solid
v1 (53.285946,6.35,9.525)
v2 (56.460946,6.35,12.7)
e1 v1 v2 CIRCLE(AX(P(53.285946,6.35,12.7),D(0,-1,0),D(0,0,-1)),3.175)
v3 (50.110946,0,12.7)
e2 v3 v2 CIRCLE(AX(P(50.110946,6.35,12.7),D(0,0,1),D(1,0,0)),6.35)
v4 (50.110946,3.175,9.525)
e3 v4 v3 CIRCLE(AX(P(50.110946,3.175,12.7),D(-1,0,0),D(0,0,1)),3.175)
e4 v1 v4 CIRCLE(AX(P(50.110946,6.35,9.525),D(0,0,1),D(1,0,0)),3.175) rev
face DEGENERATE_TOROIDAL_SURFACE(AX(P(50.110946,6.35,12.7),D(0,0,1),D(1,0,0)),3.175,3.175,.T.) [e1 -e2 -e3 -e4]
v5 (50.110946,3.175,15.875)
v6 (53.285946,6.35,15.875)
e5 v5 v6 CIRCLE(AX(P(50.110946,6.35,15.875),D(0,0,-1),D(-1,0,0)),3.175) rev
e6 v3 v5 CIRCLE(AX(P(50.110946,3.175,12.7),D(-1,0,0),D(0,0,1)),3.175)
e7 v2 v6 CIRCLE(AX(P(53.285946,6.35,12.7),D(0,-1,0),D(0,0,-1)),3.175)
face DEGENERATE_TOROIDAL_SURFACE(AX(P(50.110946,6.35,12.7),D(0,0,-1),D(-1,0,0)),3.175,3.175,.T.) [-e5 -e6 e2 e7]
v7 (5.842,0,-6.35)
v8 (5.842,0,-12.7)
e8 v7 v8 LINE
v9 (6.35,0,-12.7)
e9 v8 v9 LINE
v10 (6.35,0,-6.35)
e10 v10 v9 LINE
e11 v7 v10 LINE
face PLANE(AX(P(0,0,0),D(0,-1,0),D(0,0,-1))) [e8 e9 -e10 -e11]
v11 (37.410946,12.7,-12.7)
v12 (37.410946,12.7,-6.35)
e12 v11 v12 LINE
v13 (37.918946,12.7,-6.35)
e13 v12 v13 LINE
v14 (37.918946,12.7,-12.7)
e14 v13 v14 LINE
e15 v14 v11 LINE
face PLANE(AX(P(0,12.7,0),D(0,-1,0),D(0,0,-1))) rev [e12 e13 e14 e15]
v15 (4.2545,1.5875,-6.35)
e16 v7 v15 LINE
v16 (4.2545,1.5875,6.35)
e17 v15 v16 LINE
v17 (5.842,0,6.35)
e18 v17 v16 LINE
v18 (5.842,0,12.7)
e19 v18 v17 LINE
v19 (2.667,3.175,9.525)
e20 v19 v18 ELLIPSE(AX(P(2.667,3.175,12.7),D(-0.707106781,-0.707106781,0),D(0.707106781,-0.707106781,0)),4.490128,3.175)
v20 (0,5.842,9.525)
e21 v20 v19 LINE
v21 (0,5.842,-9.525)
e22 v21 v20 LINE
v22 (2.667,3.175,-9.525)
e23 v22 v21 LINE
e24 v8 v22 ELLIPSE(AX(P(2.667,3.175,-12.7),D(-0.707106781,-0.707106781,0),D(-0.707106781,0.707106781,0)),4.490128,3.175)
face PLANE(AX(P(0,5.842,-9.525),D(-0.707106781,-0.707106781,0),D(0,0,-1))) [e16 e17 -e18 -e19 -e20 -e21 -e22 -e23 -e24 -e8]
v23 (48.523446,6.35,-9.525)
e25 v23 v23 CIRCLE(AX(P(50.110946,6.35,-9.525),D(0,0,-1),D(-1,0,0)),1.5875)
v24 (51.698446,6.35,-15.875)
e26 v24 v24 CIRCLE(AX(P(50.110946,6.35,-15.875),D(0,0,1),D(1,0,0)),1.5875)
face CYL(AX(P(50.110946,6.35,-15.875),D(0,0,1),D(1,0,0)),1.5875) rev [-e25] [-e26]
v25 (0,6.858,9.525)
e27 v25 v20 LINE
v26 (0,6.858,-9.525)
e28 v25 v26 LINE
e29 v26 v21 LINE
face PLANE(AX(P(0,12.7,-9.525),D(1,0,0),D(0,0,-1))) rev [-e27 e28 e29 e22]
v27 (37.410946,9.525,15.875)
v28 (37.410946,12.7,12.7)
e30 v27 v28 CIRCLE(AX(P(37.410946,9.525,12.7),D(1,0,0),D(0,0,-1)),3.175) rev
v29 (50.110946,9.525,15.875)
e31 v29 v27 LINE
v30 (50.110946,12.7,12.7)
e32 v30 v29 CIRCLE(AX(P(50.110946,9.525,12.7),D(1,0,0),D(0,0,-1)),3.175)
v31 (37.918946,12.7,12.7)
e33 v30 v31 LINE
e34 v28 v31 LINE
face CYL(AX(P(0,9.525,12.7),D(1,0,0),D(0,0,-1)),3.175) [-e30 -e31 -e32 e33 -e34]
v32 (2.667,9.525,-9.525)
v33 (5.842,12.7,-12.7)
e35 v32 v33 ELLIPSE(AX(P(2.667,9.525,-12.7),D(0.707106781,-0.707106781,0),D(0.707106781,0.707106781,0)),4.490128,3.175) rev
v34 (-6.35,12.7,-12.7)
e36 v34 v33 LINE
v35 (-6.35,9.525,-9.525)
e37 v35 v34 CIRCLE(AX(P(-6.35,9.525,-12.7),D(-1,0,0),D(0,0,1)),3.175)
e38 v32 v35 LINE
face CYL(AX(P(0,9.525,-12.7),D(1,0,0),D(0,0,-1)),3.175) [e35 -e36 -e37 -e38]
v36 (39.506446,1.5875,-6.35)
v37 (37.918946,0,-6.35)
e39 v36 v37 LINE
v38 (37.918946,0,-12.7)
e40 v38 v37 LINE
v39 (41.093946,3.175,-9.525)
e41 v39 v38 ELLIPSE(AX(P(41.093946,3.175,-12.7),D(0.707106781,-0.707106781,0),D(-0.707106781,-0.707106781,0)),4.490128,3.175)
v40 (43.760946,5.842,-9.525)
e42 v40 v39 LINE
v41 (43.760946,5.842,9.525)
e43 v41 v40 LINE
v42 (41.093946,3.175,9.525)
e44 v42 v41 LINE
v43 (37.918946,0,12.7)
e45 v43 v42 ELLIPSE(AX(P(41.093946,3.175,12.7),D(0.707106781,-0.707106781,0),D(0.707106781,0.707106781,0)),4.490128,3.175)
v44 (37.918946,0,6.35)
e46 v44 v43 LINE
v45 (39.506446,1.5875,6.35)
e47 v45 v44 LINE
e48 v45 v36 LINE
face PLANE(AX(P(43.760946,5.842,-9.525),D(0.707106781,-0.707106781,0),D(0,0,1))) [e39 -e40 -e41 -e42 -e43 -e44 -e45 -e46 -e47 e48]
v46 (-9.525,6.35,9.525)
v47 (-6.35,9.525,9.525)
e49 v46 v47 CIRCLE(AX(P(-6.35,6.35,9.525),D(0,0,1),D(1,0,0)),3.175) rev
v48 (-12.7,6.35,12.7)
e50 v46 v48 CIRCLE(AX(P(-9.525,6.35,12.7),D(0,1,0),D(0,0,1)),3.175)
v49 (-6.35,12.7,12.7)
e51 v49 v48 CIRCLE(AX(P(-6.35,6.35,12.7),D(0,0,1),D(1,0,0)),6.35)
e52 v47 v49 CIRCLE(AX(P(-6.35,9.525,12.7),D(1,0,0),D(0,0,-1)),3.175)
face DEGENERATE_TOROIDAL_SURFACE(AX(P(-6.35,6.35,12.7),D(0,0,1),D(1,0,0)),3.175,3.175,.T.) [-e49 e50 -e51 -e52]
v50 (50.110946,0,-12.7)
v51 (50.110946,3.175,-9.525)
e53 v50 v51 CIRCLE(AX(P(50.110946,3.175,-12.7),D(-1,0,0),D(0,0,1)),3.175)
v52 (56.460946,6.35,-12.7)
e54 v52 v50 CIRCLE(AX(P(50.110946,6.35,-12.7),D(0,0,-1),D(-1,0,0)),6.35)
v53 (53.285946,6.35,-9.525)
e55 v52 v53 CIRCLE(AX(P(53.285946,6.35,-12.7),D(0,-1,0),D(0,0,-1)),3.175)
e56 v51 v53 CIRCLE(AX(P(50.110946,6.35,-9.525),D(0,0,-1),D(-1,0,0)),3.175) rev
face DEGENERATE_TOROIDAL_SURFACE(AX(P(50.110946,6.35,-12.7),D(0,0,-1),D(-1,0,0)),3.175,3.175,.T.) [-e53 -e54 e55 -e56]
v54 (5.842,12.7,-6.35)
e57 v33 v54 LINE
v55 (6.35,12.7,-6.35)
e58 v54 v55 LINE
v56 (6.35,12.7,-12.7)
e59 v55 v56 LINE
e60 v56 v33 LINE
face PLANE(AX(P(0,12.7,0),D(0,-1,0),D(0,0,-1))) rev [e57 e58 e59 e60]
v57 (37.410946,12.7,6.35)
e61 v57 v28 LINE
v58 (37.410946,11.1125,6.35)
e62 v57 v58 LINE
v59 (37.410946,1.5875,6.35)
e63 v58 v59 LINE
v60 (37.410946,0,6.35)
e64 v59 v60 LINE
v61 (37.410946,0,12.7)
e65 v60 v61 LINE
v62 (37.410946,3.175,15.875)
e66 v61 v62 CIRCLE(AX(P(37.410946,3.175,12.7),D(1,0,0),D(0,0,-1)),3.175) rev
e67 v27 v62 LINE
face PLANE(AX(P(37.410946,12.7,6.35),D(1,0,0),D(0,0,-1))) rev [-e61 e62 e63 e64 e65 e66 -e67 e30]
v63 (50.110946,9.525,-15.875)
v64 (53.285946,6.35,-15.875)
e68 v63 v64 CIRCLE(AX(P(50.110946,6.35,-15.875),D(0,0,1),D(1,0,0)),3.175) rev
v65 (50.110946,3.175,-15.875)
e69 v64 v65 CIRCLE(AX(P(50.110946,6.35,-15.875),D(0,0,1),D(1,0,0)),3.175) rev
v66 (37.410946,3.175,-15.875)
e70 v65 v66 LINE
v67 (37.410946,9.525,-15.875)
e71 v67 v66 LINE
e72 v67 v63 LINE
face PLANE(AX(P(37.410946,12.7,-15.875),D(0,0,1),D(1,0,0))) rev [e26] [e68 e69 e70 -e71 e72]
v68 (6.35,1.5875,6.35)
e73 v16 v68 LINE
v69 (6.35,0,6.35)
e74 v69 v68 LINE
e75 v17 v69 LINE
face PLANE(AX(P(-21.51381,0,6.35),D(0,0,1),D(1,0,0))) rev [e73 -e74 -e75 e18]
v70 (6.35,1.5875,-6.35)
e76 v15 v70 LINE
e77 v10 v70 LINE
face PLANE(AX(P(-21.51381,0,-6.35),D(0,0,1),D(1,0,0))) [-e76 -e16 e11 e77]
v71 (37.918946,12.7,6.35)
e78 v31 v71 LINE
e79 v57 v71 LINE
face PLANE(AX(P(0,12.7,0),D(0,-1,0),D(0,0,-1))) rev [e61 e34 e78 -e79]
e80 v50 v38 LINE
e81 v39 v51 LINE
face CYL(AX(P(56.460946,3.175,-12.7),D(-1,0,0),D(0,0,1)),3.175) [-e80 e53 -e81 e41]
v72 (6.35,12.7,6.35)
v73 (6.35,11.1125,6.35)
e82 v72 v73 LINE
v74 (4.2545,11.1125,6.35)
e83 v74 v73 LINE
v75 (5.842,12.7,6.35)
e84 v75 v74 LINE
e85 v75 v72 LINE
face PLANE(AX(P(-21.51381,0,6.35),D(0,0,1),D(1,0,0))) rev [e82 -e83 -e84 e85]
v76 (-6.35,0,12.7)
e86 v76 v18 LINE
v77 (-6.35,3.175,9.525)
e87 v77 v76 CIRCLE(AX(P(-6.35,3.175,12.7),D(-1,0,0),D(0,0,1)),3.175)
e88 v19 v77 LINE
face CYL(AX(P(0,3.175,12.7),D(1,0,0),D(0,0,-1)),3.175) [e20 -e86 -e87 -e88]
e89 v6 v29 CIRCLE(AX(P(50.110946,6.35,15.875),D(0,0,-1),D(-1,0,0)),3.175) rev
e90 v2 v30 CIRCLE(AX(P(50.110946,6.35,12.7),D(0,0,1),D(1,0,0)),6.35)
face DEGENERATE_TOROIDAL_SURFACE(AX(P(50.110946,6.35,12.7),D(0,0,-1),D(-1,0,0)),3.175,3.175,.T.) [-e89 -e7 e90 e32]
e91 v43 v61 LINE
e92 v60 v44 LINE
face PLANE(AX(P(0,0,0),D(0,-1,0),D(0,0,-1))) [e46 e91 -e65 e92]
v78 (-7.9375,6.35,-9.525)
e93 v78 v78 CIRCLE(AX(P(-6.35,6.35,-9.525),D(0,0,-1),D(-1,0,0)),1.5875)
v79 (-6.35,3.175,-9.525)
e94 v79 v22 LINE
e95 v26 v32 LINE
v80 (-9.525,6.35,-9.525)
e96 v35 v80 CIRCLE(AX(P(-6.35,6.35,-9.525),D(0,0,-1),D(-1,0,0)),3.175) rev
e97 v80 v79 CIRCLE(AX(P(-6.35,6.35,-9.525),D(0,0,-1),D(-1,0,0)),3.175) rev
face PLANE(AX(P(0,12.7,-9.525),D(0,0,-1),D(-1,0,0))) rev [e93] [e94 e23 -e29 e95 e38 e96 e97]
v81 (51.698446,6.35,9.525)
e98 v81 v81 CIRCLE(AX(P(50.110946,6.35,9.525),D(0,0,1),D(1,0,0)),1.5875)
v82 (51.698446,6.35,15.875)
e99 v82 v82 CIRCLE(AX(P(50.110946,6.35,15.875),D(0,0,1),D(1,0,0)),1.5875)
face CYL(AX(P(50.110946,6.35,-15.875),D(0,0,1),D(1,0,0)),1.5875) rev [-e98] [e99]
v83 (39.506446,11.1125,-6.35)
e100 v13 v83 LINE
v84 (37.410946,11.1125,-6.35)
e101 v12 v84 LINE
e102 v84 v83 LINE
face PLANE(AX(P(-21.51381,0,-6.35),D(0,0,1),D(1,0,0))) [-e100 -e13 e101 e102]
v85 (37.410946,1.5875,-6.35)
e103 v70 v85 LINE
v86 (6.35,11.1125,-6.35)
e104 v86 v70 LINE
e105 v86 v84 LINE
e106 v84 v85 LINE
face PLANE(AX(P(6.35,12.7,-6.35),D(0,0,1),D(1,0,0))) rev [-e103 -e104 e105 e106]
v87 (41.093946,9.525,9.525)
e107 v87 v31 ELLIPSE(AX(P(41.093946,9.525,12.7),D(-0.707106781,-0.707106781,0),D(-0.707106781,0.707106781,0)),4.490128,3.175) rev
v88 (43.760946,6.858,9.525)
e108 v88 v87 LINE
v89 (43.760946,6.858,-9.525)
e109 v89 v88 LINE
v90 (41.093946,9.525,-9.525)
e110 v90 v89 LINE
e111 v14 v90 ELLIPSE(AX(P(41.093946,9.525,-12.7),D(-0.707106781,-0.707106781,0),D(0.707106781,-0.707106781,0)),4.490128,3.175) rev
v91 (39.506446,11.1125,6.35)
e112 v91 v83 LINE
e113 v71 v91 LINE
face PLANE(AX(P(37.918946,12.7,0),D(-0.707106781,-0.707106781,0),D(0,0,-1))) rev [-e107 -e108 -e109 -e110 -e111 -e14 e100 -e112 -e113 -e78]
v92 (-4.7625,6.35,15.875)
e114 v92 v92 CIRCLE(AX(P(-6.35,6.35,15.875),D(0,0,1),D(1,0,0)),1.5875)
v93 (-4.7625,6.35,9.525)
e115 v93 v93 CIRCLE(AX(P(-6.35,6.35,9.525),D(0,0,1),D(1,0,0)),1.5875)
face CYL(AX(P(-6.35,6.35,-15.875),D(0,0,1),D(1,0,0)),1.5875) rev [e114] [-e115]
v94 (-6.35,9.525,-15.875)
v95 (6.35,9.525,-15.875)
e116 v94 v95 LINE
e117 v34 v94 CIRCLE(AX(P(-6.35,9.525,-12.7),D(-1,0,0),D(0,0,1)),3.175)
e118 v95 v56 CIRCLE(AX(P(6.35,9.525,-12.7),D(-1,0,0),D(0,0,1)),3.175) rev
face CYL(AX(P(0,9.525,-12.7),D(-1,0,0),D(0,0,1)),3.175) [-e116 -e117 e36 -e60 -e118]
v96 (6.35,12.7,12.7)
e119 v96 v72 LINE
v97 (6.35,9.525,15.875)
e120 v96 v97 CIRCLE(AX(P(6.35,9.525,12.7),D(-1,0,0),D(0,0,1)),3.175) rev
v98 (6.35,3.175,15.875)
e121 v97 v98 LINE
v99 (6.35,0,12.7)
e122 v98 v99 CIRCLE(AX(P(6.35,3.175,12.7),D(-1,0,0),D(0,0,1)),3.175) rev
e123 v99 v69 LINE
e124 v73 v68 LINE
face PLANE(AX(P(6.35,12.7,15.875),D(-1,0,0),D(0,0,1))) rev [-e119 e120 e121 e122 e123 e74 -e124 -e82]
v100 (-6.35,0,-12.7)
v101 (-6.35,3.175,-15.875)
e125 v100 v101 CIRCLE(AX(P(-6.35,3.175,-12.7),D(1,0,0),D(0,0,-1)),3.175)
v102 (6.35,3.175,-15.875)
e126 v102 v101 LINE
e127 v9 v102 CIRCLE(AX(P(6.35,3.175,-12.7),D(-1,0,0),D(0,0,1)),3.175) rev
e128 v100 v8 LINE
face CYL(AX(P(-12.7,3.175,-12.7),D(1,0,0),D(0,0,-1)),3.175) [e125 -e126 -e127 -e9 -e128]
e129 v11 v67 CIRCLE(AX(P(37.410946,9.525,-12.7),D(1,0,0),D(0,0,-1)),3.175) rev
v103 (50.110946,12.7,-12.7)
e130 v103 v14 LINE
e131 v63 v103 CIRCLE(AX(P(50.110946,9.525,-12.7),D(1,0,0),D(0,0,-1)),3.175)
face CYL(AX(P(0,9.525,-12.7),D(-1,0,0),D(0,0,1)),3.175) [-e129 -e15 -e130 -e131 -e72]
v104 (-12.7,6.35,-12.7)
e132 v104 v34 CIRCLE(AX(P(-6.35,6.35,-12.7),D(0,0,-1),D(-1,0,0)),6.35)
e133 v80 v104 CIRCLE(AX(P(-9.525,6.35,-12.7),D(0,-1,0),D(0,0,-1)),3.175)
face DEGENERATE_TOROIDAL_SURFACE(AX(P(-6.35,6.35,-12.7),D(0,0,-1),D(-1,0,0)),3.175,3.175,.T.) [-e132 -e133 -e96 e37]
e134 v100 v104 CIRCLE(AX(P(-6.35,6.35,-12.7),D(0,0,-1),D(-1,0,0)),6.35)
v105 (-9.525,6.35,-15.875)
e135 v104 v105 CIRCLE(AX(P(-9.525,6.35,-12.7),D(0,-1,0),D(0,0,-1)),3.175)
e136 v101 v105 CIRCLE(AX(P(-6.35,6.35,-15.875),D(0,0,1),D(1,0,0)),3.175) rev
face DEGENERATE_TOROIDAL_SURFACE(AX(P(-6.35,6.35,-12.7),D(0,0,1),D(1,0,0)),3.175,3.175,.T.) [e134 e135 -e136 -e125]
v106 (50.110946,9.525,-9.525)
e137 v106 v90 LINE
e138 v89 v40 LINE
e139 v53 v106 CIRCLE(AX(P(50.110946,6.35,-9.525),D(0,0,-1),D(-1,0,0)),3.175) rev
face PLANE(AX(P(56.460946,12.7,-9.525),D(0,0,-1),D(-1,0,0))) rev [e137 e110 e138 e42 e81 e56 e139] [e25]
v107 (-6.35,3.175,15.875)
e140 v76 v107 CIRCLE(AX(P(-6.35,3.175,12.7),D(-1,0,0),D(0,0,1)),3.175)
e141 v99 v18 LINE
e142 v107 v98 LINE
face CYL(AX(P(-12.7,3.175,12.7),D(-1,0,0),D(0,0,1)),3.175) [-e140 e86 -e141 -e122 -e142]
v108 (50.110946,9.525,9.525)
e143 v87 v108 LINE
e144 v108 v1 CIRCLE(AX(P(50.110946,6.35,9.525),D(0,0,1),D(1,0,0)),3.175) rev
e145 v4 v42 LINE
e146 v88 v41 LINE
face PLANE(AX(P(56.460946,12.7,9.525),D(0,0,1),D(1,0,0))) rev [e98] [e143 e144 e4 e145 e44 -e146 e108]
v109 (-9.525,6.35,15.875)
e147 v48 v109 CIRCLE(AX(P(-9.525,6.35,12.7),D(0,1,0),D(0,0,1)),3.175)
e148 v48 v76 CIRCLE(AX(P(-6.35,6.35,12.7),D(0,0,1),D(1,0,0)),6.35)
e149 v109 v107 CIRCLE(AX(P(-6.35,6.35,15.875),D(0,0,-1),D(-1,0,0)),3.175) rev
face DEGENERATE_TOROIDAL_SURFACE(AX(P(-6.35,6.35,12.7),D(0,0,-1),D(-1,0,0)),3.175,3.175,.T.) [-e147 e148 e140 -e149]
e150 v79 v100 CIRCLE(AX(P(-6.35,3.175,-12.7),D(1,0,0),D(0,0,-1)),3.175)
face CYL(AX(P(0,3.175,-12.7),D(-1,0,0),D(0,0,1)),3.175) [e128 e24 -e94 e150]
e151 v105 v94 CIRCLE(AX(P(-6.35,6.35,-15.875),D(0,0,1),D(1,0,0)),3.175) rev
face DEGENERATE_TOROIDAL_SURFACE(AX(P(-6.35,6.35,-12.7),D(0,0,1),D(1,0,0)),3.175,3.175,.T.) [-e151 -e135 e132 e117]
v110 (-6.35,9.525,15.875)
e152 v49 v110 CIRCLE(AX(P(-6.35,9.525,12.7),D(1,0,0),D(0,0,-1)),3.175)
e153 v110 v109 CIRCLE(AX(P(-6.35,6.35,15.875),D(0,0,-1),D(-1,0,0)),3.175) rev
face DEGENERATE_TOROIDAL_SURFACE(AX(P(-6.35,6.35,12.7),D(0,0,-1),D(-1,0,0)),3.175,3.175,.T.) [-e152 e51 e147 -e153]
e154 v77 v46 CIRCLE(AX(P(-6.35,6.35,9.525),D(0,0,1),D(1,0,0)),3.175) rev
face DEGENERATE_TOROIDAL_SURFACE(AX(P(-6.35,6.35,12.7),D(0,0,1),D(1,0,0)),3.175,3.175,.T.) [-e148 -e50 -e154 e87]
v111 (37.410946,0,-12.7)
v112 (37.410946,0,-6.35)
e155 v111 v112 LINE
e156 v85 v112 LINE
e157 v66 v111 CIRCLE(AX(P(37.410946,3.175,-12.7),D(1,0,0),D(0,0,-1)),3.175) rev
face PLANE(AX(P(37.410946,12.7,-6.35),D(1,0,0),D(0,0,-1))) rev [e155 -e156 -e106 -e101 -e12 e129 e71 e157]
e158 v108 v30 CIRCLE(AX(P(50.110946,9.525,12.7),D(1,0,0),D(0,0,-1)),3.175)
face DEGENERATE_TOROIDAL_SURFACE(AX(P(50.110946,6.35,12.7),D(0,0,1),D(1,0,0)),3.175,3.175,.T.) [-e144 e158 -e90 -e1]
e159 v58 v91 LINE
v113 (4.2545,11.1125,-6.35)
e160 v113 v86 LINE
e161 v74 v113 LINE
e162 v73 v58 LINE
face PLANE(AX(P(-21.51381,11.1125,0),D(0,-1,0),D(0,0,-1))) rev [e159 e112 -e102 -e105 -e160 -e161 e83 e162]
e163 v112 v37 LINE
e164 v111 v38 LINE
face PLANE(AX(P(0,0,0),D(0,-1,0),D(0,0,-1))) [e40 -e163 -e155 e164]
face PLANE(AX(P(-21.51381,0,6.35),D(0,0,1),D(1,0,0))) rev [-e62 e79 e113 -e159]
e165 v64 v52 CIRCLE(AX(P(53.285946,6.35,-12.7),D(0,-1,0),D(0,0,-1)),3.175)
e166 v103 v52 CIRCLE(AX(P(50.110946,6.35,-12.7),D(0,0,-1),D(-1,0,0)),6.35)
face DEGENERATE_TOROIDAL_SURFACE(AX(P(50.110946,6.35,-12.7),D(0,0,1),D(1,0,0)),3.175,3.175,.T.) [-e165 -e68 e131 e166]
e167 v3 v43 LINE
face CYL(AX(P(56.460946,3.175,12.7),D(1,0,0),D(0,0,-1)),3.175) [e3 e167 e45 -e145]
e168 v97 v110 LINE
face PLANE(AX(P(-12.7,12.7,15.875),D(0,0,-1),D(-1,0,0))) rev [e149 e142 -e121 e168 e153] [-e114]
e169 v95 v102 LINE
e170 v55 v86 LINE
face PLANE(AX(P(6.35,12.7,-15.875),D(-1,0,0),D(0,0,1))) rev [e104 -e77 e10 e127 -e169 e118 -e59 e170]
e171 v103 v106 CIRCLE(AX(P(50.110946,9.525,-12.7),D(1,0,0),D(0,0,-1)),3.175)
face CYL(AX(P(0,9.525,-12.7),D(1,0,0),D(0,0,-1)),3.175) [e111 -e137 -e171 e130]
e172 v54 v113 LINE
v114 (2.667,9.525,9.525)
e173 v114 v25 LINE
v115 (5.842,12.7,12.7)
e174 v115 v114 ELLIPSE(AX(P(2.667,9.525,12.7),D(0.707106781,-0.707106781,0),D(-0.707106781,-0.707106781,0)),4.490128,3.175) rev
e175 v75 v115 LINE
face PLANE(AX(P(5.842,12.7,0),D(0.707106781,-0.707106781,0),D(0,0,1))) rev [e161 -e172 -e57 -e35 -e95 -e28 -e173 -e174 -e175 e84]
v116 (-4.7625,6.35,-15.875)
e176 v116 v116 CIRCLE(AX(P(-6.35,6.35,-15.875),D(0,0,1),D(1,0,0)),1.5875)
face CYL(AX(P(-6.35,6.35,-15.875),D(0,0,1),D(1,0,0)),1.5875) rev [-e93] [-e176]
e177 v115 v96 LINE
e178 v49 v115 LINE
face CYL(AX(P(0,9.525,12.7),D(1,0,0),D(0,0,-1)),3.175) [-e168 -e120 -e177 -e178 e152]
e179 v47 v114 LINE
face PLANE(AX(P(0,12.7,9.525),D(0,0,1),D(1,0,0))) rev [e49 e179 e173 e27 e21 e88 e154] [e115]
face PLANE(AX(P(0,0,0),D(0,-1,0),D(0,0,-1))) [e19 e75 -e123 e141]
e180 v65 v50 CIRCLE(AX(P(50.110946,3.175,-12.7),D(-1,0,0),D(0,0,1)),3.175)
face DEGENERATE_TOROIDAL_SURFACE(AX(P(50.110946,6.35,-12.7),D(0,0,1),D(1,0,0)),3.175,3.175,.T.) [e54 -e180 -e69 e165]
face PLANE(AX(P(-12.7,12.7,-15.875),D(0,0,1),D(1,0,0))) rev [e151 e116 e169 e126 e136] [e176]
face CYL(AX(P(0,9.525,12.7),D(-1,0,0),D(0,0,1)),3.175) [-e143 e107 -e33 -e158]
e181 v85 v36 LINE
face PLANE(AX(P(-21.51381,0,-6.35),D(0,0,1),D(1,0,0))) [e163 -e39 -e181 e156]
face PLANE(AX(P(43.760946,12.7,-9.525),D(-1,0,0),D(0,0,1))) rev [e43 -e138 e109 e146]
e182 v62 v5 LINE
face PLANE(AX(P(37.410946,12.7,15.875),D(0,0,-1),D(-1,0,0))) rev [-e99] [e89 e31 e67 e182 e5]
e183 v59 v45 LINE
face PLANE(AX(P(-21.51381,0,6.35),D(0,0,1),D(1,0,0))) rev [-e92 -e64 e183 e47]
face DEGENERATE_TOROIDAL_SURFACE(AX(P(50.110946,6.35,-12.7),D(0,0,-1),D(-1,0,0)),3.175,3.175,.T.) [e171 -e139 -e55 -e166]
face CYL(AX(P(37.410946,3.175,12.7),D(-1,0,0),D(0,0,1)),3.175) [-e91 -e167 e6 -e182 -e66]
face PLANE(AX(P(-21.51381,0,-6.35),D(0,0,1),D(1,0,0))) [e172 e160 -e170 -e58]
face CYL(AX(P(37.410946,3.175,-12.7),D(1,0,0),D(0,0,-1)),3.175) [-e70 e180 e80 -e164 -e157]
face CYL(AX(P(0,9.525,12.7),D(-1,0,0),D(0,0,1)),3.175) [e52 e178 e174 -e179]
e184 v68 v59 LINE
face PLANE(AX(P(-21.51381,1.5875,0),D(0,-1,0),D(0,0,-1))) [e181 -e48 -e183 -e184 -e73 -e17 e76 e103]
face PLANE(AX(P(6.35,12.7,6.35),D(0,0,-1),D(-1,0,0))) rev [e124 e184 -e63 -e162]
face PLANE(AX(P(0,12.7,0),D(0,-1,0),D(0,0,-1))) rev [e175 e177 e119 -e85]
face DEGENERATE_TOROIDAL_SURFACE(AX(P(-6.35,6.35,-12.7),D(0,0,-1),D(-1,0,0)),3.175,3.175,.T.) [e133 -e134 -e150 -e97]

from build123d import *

# Parameters (mm, degrees)
BOSS_EXTRUDE1_DEPTH = 12.7
SKETCH2_R           = 1.5875
CUT_EXTRUDE1_DEPTH  = 67.009021317
FILLET5_R           = 6.35
FILLET6_R           = 3.175
CHAMFER1_START      = -12.7
CHAMFER1_DEPTH      = 25.4
CHAMFER1_2_DEPTH    = 5.842
CHAMFER1_START_2    = 37.918945752
CHAMFER1_3_DEPTH    = 5.842
CUT_EXTRUDE2_REACH  = 62.01
SKETCH4_W           = 12.7
SKETCH4_H           = 1.5875


with BuildPart() as part:
    # Sketch1 → Boss-Extrude1 (new body)
    with BuildSketch(Plane(origin=(0, 0, 0), x_dir=(1, 0, 0), z_dir=(0, 1, 0))):
        Polygon((0, 9.525), (-12.7, 9.525), (-12.7, 15.875), (6.35, 15.875), (6.35, 6.35), (37.410945752, 6.35), (37.410945752, 15.875), (56.460945752, 15.875), (56.460945752, 9.525), (43.760945752, 9.525), (43.760945752, -9.525), (56.460945752, -9.525), (56.460945752, -15.875), (37.410945752, -15.875), (37.410945752, -6.35), (6.35, -6.35), (6.35, -15.875), (-12.7, -15.875), (-12.7, -9.525), (0, -9.525), align=None)
    extrude(amount=BOSS_EXTRUDE1_DEPTH)

    # Sketch2 → Cut-Extrude1 (cut, through all)
    with BuildSketch(Plane.XY.offset(15.875)):
        with Locations((50.110945752, 6.35)):
            Circle(SKETCH2_R)
        with Locations((-6.35, 6.35)):
            Circle(SKETCH2_R)
    extrude(amount=-CUT_EXTRUDE1_DEPTH, mode=Mode.SUBTRACT)

    # Fillet5
    fillet5_edges = [part.edges().sort_by_distance(p)[0] for p in [
        (56.460945752, 0, 12.7),
        (56.460945752, 12.7, 12.7),
        (56.460945752, 0, -12.7),
        (56.460945752, 12.7, -12.7),
        (-12.7, 12.7, 12.7),
        (-12.7, 0, 12.7),
        (-12.7, 0, -12.7),
        (-12.7, 12.7, -12.7),
    ]]
    fillet(fillet5_edges, radius=FILLET5_R - 0.0001)  # a hair under: the kernel refuses the full size

    # Fillet6
    fillet6_edges = [part.edges().sort_by_distance(p)[0] for p in [
        (43.760995752, 0, 15.875),
        (54.601103102, 1.85984265, 15.875),
        (54.601103102, 10.84015735, 15.875),
        (43.760995752, 0, -15.875),
        (54.601103102, 1.85984265, -15.875),
        (54.601103102, 10.84015735, -15.875),
        (-5e-05, 0, -15.875),
        (-10.84015735, 1.85984265, -15.875),
        (-10.84015735, 10.84015735, -15.875),
        (-5e-05, 12.7, 15.875),
        (-5e-05, 0, 15.875),
        (-10.84015735, 1.85984265, 15.875),
        (-3.17505, 12.7, -9.525),
        (-3.17505, 0, -9.525),
        (-10.84015735, 1.85984265, -9.525),
        (-3.17505, 0, 9.525),
        (-10.84015735, 1.85984265, 9.525),
        (-3.17505, 12.7, 9.525),
        (46.935995752, 0, -9.525),
        (54.601103102, 1.85984265, -9.525),
        (46.935995752, 12.7, -9.525),
        (46.935995752, 12.7, 9.525),
        (46.935995752, 0, 9.525),
        (54.601103102, 1.85984265, 9.525),
        (43.760995752, 12.7, 15.875),
        (43.760995752, 12.7, -15.875),
        (-5e-05, 12.7, -15.875),
        (-10.84015735, 10.84015735, 15.875),
        (-10.84015735, 10.84015735, -9.525),
        (-10.84015735, 10.84015735, 9.525),
        (54.601103102, 10.84015735, -9.525),
        (54.601103102, 10.84015735, 9.525),
    ]]
    fillet(fillet6_edges, radius=FILLET6_R - 0.0001)  # a hair under: the kernel refuses the full size

    # Chamfer1: read off the stored shape, not the designer's step
    # Chamfer1 outline → Chamfer1 (cut)
    with BuildSketch(Plane.XY.offset(CHAMFER1_START)):
        Polygon((43.760945752, 5.842), (37.918945752, 0), (43.760945752, 0), align=None)
        Polygon((0, 0), (5.842, 0), (0, 5.842), align=None)
        Polygon((37.918945752, 12.7), (43.760945752, 6.858), (43.760945752, 12.7), align=None)
        Polygon((0, 12.7), (0, 6.858), (5.842, 12.7), align=None)
    extrude(amount=CHAMFER1_DEPTH, mode=Mode.SUBTRACT)

    # Chamfer1 2 outline → Chamfer1 2 (add)
    with BuildSketch(Plane.YZ):
        with BuildLine():
            Line((6.858, 9.525), (9.525, 9.525))
            ThreePointArc((9.525, 9.525), (11.77006403, 10.45493597), (12.7, 12.7))
            Line((12.7, 12.7), (6.858, 12.7))
            Line((6.858, 12.7), (6.858, 9.525))
        make_face()
        with BuildLine():
            ThreePointArc((3.175, -9.525), (0.92993597, -10.45493597), (0, -12.7))
            Line((0, -12.7), (5.842, -12.7))
            Line((5.842, -12.7), (5.842, -9.525))
            Line((5.842, -9.525), (3.175, -9.525))
        make_face()
        with BuildLine():
            Line((6.858, -9.525), (6.858, -12.7))
            Line((6.858, -12.7), (12.7, -12.7))
            ThreePointArc((12.7, -12.7), (11.77006403, -10.45493597), (9.525, -9.525))
            Line((9.525, -9.525), (6.858, -9.525))
        make_face()
        with BuildLine():
            ThreePointArc((0, 12.7), (0.92993597, 10.45493597), (3.175, 9.525))
            Line((3.175, 9.525), (5.842, 9.525))
            Line((5.842, 9.525), (5.842, 12.7))
            Line((5.842, 12.7), (0, 12.7))
        make_face()
    extrude(amount=CHAMFER1_2_DEPTH)

    # Chamfer1 3 outline → Chamfer1 3 (add)
    with BuildSketch(Plane.YZ.offset(CHAMFER1_START_2)):
        with BuildLine():
            Line((6.858, 9.525), (9.525, 9.525))
            ThreePointArc((9.525, 9.525), (11.77006403, 10.45493597), (12.7, 12.7))
            Line((12.7, 12.7), (6.858, 12.7))
            Line((6.858, 12.7), (6.858, 9.525))
        make_face()
        with BuildLine():
            ThreePointArc((3.175, -9.525), (0.92993597, -10.45493597), (0, -12.7))
            Line((0, -12.7), (5.842, -12.7))
            Line((5.842, -12.7), (5.842, -9.525))
            Line((5.842, -9.525), (3.175, -9.525))
        make_face()
        with BuildLine():
            Line((6.858, -9.525), (6.858, -12.7))
            Line((6.858, -12.7), (12.7, -12.7))
            ThreePointArc((12.7, -12.7), (11.77006403, -10.45493597), (9.525, -9.525))
            Line((9.525, -9.525), (6.858, -9.525))
        make_face()
        with BuildLine():
            ThreePointArc((0, 12.7), (0.92993597, 10.45493597), (3.175, 9.525))
            Line((3.175, 9.525), (5.842, 9.525))
            Line((5.842, 9.525), (5.842, 12.7))
            Line((5.842, 12.7), (0, 12.7))
        make_face()
    extrude(amount=CHAMFER1_3_DEPTH)

    # Cut-Extrude2: up to this plane
    cut_extrude2_end = Plane(origin=(5.842, 12.7, 0), z_dir=(0.7071067811865497, -0.7071067811865455, 0))
    # Sketch4 → Cut-Extrude2 (cut, up to the surface)
    with BuildSketch(Plane(origin=(43.760945752, 0, 0), x_dir=(0, 0, -1), z_dir=(1, 0, 0)), mode=Mode.PRIVATE) as cut_extrude2_sk1:
        with Locations((0, 11.90625)):
            Rectangle(SKETCH4_W, SKETCH4_H)
    cut_extrude2_tool1 = split(extrude(cut_extrude2_sk1.sketch, amount=-CUT_EXTRUDE2_REACH, mode=Mode.PRIVATE), bisect_by=cut_extrude2_end, keep=Keep.BOTH, mode=Mode.PRIVATE)
    add(cut_extrude2_tool1.solids().sort_by_distance((43.760946, 11.90625, 0))[0], mode=Mode.SUBTRACT)
    # Sketch4 → Cut-Extrude2 (cut, up to the surface)
    with BuildSketch(Plane(origin=(43.760945752, 0, 0), x_dir=(0, 0, -1), z_dir=(1, 0, 0)), mode=Mode.PRIVATE) as cut_extrude2_sk2:
        with Locations((0, 0.79375)):
            Rectangle(SKETCH4_W, SKETCH4_H)
    cut_extrude2_tool2 = split(extrude(cut_extrude2_sk2.sketch, amount=-CUT_EXTRUDE2_REACH, mode=Mode.PRIVATE), bisect_by=cut_extrude2_end, keep=Keep.BOTH, mode=Mode.PRIVATE)
    add(cut_extrude2_tool2.solids().sort_by_distance((43.760946, 0.79375, 0))[0], mode=Mode.SUBTRACT)


solid = part.part
